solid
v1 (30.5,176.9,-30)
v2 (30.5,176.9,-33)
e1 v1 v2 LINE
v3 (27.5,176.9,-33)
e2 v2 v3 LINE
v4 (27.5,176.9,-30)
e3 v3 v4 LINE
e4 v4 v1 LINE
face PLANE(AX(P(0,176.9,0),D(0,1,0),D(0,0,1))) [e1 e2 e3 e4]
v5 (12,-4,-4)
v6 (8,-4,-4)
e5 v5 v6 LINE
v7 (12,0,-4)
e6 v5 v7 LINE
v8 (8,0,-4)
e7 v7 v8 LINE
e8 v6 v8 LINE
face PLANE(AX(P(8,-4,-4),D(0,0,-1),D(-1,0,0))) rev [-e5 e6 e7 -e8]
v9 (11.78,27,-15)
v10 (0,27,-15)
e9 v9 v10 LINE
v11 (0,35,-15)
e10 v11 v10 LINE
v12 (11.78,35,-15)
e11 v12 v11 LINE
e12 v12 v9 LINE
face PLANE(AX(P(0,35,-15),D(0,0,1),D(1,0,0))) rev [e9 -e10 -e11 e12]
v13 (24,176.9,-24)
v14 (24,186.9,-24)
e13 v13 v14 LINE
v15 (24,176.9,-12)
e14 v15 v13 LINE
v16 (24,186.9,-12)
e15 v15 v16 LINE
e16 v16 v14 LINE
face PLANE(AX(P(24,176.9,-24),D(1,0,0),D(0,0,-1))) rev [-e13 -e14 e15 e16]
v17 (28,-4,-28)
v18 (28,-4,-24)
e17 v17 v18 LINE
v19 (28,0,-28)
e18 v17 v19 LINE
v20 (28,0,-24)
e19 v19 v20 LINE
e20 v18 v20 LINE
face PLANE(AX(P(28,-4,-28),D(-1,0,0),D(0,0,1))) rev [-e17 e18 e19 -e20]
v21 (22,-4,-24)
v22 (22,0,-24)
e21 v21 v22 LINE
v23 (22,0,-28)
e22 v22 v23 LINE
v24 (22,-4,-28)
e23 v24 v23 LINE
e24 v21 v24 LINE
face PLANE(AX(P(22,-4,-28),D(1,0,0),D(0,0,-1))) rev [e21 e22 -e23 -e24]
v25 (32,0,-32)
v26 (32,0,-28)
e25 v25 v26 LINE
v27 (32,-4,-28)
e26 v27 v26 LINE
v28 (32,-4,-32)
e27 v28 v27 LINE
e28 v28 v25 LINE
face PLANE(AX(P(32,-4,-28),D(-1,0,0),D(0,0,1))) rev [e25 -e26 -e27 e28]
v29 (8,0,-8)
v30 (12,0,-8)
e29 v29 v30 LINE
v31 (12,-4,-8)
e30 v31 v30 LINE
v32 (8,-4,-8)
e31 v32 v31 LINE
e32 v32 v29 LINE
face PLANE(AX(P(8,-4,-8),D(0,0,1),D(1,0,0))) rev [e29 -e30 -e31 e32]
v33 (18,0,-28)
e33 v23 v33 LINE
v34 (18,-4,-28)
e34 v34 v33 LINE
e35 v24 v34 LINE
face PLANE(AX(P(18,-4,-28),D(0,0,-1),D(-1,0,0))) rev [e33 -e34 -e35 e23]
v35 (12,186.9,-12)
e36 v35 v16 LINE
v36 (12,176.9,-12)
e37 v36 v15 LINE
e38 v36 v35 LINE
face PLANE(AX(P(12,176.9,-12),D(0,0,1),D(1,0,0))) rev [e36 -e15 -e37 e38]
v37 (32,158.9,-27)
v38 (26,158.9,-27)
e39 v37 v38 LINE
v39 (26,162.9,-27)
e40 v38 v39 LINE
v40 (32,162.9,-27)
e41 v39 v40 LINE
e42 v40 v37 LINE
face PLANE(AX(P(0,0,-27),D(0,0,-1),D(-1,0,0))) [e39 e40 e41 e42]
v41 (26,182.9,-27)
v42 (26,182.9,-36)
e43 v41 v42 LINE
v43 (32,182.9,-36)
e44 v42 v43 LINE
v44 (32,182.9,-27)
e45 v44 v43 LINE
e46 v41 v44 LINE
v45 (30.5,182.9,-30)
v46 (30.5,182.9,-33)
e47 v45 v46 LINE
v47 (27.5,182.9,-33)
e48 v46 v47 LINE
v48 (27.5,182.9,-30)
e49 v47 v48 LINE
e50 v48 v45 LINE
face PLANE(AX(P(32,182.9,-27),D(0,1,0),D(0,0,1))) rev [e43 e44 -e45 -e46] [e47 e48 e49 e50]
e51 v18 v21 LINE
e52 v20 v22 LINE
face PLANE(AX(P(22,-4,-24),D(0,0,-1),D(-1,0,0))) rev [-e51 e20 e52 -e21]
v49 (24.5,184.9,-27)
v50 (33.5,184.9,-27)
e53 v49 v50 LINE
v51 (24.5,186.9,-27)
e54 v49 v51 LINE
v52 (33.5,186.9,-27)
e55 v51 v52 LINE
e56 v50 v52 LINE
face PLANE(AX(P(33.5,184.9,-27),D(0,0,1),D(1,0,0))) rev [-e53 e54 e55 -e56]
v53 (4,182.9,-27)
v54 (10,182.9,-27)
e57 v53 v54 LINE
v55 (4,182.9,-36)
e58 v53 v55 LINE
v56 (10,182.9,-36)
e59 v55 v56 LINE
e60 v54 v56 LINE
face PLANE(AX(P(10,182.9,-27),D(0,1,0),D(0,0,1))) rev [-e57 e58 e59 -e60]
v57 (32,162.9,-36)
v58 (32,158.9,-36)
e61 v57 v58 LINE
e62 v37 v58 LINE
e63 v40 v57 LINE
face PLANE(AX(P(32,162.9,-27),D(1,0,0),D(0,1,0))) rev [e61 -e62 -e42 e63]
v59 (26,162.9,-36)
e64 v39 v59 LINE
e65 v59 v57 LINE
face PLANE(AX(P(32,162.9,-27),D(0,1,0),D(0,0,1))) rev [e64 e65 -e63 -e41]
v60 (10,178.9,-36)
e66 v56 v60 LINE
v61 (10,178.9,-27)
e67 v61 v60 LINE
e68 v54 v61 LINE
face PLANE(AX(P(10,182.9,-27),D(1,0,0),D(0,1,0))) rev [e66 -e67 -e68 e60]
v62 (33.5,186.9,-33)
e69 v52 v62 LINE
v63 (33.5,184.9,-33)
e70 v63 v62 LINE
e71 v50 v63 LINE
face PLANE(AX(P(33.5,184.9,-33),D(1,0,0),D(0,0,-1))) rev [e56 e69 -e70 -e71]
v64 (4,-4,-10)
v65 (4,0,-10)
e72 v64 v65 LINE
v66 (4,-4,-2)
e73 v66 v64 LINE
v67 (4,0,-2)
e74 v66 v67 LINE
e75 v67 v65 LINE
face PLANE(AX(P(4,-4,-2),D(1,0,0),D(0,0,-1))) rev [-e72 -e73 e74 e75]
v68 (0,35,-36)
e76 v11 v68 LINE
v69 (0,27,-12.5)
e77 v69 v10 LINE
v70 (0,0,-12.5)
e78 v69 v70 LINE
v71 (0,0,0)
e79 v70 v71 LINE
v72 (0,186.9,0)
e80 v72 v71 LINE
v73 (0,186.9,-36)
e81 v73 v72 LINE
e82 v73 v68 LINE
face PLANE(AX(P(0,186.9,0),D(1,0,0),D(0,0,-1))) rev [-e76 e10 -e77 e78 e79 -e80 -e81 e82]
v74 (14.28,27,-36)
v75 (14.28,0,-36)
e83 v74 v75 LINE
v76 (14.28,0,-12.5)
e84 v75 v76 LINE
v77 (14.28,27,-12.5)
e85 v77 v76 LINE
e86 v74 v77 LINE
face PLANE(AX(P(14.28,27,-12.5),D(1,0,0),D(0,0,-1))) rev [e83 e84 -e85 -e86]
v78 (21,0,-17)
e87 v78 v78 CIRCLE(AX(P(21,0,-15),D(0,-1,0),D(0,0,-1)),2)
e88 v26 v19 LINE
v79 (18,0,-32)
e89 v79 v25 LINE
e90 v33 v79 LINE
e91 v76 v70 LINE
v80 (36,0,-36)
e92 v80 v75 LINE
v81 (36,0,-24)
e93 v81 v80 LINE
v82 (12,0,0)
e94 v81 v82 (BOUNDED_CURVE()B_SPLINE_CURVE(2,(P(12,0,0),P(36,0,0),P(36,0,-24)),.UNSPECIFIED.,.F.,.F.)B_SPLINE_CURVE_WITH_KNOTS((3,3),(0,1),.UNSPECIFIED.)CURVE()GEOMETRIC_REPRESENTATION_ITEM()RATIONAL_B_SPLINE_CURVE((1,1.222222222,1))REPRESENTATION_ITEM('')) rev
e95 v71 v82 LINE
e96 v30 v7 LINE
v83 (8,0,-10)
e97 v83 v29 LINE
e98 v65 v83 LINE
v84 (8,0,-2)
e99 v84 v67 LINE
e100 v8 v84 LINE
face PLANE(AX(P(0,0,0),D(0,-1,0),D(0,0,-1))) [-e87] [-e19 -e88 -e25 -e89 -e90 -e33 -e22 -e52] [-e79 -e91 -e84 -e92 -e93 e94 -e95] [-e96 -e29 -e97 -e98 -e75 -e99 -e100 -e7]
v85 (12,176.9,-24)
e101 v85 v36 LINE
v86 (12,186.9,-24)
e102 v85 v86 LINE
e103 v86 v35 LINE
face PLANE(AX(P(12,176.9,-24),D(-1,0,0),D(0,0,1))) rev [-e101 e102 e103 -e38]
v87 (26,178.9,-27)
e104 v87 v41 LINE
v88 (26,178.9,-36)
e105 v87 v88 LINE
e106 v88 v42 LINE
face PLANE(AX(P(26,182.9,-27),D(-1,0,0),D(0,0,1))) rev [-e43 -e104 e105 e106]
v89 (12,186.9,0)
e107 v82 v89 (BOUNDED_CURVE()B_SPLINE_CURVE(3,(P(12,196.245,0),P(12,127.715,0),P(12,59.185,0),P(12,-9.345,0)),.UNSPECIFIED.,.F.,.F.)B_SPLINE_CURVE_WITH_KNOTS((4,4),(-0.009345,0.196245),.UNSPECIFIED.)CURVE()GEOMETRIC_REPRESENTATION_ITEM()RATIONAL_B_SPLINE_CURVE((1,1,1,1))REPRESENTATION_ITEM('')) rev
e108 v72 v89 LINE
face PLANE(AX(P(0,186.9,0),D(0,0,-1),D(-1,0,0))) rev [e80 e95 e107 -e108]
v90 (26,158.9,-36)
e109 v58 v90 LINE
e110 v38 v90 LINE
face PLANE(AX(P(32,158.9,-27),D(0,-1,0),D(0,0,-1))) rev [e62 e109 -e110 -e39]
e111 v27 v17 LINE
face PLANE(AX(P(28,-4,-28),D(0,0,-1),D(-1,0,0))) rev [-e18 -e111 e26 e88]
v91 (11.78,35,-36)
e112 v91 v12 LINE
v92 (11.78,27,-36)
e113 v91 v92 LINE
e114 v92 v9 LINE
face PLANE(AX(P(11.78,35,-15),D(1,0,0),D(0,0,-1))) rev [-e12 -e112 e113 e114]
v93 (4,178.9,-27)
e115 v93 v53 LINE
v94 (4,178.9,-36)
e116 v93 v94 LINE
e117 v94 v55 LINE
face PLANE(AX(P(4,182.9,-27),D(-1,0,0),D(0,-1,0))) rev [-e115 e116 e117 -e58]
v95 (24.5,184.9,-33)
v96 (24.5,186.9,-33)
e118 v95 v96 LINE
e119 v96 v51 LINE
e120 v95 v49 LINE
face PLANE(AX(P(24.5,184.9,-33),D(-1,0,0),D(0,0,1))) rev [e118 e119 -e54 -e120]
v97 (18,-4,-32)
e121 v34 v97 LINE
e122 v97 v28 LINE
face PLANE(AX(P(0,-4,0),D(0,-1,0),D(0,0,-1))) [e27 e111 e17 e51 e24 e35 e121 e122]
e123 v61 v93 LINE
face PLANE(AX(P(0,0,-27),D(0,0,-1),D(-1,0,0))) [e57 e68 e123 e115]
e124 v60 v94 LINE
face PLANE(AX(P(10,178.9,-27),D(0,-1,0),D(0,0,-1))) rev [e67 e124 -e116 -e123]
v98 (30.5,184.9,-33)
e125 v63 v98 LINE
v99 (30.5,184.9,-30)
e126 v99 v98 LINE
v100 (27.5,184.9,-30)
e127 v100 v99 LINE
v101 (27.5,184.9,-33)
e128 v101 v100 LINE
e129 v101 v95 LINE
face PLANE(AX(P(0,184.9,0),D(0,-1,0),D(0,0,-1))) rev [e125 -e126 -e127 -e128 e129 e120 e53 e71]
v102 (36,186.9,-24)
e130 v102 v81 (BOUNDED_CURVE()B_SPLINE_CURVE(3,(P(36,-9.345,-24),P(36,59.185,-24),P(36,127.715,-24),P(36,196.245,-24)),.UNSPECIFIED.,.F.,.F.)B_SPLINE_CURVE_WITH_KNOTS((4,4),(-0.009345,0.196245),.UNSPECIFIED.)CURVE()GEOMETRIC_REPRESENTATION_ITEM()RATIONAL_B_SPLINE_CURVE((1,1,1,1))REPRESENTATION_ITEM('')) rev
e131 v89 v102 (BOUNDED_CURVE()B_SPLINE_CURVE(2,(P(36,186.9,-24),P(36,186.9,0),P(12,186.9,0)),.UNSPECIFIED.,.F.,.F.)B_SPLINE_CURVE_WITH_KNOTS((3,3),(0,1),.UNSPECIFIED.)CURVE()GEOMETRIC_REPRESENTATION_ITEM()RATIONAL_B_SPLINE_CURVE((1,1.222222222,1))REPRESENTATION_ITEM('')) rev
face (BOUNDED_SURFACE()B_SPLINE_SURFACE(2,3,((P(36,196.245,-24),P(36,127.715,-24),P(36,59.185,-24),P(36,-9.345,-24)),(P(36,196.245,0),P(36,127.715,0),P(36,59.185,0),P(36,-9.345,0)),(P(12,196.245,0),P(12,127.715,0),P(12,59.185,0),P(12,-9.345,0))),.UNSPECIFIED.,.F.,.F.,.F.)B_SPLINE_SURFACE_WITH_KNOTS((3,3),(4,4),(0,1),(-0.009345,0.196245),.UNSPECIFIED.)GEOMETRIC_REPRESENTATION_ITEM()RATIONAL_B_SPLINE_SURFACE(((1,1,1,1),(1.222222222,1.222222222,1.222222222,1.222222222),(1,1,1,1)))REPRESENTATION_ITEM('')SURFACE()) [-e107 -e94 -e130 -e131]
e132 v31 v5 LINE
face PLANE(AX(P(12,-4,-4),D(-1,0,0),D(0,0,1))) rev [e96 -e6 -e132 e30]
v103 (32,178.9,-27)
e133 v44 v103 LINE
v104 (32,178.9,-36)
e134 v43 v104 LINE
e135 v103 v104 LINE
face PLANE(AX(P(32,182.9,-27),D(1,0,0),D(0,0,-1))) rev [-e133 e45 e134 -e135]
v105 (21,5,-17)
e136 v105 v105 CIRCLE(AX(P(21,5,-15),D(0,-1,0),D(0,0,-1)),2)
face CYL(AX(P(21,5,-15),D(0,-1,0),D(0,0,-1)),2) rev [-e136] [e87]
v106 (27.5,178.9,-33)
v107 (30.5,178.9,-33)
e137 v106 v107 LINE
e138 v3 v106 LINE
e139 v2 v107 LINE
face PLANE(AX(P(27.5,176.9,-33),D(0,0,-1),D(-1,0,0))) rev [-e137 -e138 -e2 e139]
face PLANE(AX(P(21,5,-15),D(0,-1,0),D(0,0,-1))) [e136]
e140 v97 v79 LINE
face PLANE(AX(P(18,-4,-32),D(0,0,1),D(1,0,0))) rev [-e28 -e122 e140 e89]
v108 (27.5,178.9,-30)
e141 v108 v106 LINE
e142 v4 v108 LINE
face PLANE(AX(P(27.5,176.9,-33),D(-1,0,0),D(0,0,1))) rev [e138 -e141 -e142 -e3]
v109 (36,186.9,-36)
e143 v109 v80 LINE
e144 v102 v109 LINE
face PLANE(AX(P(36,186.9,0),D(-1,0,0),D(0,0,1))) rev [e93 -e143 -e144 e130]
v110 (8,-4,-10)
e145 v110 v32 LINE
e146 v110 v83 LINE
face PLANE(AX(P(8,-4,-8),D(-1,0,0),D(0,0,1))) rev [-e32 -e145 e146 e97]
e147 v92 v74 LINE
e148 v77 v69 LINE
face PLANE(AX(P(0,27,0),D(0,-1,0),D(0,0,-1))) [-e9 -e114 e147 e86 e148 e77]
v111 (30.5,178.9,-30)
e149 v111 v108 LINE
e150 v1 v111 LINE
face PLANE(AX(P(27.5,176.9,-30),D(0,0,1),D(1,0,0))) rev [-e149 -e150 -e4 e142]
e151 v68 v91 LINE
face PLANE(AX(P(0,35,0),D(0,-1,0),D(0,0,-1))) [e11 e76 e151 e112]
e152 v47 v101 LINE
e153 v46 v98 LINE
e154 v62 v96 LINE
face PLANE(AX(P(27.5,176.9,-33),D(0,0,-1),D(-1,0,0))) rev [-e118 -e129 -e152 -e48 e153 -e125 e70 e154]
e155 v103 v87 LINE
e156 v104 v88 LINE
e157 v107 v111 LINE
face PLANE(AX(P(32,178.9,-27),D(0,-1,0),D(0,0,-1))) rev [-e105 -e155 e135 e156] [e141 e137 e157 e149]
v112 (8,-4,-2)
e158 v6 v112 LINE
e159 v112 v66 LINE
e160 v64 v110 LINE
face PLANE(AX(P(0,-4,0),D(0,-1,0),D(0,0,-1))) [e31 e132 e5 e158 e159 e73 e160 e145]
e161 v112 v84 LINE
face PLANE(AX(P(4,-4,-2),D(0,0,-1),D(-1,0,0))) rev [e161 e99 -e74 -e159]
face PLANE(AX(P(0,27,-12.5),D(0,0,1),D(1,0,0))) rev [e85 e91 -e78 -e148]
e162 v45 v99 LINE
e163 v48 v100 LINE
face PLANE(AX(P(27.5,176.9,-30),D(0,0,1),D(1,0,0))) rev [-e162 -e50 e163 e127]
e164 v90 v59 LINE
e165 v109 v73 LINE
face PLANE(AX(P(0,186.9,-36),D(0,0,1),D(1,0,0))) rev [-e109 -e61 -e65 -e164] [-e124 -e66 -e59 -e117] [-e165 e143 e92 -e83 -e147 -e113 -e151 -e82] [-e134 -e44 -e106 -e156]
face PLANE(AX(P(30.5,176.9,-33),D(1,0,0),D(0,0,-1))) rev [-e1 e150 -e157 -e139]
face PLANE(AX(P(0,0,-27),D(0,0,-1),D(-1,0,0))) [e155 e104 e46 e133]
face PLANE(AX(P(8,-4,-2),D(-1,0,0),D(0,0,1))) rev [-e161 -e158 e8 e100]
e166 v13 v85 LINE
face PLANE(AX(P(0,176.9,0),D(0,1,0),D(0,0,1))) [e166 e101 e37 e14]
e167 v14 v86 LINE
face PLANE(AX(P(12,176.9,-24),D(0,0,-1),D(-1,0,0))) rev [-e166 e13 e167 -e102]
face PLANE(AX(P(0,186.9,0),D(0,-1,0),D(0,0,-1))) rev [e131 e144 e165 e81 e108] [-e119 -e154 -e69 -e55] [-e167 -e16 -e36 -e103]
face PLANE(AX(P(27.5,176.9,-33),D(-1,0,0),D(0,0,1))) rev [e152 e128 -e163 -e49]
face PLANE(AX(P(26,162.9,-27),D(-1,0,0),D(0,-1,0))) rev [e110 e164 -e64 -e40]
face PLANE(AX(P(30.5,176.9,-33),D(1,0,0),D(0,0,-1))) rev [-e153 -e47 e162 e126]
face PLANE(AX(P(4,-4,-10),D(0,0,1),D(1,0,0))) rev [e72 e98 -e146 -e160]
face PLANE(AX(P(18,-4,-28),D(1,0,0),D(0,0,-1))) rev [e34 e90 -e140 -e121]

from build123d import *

# Parameters (mm, degrees)
SKETCH1_W           = 36
SKETCH1_H           = 36
BOSS_EXTRUDE1_DEPTH = 186.9
FILLET1_SIZE        = 24
SKETCH2_W           = 14.28
SKETCH2_H           = 23.5
CUT_EXTRUDE1_DEPTH  = 27
SKETCH3_W           = 11.78
SKETCH3_H           = 21
CUT_EXTRUDE2_DEPTH  = 8
SKETCH4_R           = 2
CUT_EXTRUDE3_DEPTH  = 5
BOSS_EXTRUDE2_DEPTH = 4
SKETCH6_W           = 6
SKETCH6_H           = 4
CUT_EXTRUDE4_DEPTH  = 9
SKETCH7_W           = 3
SKETCH7_H           = 3
SKETCH7_W_2         = 12
SKETCH7_H_2         = 12
CUT_EXTRUDE5_DEPTH  = 10
SKETCH8_W           = 9
SKETCH8_H           = 6
CUT_EXTRUDE6_DEPTH  = 2


with BuildPart() as part:
    # Sketch1 → Boss-Extrude1 (new body)
    with BuildSketch(Plane(origin=(0, 0, 0), x_dir=(1, 0, 0), z_dir=(0, 1, 0))):
        with Locations((18, 18)):
            Rectangle(SKETCH1_W, SKETCH1_H)
    extrude(amount=BOSS_EXTRUDE1_DEPTH)

    # Fillet1
    # a fillet whose section is not a circle: 24 mm, written as the material it takes off along each edge
    with BuildSketch(Plane(origin=(36, -60, 0), x_dir=(-1, 0, 0), z_dir=(0, 1, 0))) as fillet1_piece_1:
        with BuildLine():
            Bezier((FILLET1_SIZE, 0), (0, 0), (0, -FILLET1_SIZE), weights=[1, 1.222222222, 1])
            Line((0, -FILLET1_SIZE), (0, 0))
            Line((0, 0), (FILLET1_SIZE, 0))
        make_face()
    extrude(amount=306.9, mode=Mode.SUBTRACT)

    # Sketch2 → Cut-Extrude1 (cut)
    with BuildSketch(Plane.XZ):
        with Locations((7.14, -24.25)):
            Rectangle(SKETCH2_W, SKETCH2_H)
    extrude(amount=-CUT_EXTRUDE1_DEPTH, mode=Mode.SUBTRACT)

    # Sketch3 → Cut-Extrude2 (cut)
    with BuildSketch(Plane.XZ.offset(-27)):
        with Locations((5.89, -25.5)):
            Rectangle(SKETCH3_W, SKETCH3_H)
    extrude(amount=-CUT_EXTRUDE2_DEPTH, mode=Mode.SUBTRACT)

    # Sketch4 → Cut-Extrude3 (cut)
    with BuildSketch(Plane.XZ):
        with Locations(Location((21, -15, 0), (0, 0, 270))):
            Circle(SKETCH4_R)
    extrude(amount=-CUT_EXTRUDE3_DEPTH, mode=Mode.SUBTRACT)

    # Sketch5 → Boss-Extrude2 (add)
    with BuildSketch(Plane.XZ):
        Polygon((18, -28), (22, -28), (22, -24), (28, -24), (28, -28), (32, -28), (32, -32), (18, -32), align=None)
        Polygon((4, -2), (8, -2), (8, -4), (12, -4), (12, -8), (8, -8), (8, -10), (4, -10), align=None)
    extrude(amount=BOSS_EXTRUDE2_DEPTH)

    # Sketch6 → Cut-Extrude4 (cut)
    with BuildSketch(Plane(origin=(0, 0, -36), x_dir=(-1, 0, 0), z_dir=(0, 0, -1))):
        with Locations((-29, 180.9)):
            Rectangle(SKETCH6_W, SKETCH6_H)
        with Locations((-7, 180.9)):
            Rectangle(SKETCH6_W, SKETCH6_H)
        with Locations((-29, 160.9)):
            Rectangle(SKETCH6_W, SKETCH6_H)
    extrude(amount=-CUT_EXTRUDE4_DEPTH, mode=Mode.SUBTRACT)

    # Sketch7 → Cut-Extrude5 (cut)
    with BuildSketch(Plane(origin=(0, 186.9, 0), x_dir=(1, 0, 0), z_dir=(0, 1, 0))):
        with Locations((29, 31.5)):
            Rectangle(SKETCH7_W, SKETCH7_H)
        with Locations((18, 18)):
            Rectangle(SKETCH7_W_2, SKETCH7_H_2)
    extrude(amount=-CUT_EXTRUDE5_DEPTH, mode=Mode.SUBTRACT)

    # Sketch8 → Cut-Extrude6 (cut)
    with BuildSketch(Plane(origin=(0, 186.9, 0), x_dir=(1, 0, 0), z_dir=(0, 1, 0))):
        with Locations((29, 30)):
            Rectangle(SKETCH8_W, SKETCH8_H)
    extrude(amount=-CUT_EXTRUDE6_DEPTH, mode=Mode.SUBTRACT)


solid = part.part
